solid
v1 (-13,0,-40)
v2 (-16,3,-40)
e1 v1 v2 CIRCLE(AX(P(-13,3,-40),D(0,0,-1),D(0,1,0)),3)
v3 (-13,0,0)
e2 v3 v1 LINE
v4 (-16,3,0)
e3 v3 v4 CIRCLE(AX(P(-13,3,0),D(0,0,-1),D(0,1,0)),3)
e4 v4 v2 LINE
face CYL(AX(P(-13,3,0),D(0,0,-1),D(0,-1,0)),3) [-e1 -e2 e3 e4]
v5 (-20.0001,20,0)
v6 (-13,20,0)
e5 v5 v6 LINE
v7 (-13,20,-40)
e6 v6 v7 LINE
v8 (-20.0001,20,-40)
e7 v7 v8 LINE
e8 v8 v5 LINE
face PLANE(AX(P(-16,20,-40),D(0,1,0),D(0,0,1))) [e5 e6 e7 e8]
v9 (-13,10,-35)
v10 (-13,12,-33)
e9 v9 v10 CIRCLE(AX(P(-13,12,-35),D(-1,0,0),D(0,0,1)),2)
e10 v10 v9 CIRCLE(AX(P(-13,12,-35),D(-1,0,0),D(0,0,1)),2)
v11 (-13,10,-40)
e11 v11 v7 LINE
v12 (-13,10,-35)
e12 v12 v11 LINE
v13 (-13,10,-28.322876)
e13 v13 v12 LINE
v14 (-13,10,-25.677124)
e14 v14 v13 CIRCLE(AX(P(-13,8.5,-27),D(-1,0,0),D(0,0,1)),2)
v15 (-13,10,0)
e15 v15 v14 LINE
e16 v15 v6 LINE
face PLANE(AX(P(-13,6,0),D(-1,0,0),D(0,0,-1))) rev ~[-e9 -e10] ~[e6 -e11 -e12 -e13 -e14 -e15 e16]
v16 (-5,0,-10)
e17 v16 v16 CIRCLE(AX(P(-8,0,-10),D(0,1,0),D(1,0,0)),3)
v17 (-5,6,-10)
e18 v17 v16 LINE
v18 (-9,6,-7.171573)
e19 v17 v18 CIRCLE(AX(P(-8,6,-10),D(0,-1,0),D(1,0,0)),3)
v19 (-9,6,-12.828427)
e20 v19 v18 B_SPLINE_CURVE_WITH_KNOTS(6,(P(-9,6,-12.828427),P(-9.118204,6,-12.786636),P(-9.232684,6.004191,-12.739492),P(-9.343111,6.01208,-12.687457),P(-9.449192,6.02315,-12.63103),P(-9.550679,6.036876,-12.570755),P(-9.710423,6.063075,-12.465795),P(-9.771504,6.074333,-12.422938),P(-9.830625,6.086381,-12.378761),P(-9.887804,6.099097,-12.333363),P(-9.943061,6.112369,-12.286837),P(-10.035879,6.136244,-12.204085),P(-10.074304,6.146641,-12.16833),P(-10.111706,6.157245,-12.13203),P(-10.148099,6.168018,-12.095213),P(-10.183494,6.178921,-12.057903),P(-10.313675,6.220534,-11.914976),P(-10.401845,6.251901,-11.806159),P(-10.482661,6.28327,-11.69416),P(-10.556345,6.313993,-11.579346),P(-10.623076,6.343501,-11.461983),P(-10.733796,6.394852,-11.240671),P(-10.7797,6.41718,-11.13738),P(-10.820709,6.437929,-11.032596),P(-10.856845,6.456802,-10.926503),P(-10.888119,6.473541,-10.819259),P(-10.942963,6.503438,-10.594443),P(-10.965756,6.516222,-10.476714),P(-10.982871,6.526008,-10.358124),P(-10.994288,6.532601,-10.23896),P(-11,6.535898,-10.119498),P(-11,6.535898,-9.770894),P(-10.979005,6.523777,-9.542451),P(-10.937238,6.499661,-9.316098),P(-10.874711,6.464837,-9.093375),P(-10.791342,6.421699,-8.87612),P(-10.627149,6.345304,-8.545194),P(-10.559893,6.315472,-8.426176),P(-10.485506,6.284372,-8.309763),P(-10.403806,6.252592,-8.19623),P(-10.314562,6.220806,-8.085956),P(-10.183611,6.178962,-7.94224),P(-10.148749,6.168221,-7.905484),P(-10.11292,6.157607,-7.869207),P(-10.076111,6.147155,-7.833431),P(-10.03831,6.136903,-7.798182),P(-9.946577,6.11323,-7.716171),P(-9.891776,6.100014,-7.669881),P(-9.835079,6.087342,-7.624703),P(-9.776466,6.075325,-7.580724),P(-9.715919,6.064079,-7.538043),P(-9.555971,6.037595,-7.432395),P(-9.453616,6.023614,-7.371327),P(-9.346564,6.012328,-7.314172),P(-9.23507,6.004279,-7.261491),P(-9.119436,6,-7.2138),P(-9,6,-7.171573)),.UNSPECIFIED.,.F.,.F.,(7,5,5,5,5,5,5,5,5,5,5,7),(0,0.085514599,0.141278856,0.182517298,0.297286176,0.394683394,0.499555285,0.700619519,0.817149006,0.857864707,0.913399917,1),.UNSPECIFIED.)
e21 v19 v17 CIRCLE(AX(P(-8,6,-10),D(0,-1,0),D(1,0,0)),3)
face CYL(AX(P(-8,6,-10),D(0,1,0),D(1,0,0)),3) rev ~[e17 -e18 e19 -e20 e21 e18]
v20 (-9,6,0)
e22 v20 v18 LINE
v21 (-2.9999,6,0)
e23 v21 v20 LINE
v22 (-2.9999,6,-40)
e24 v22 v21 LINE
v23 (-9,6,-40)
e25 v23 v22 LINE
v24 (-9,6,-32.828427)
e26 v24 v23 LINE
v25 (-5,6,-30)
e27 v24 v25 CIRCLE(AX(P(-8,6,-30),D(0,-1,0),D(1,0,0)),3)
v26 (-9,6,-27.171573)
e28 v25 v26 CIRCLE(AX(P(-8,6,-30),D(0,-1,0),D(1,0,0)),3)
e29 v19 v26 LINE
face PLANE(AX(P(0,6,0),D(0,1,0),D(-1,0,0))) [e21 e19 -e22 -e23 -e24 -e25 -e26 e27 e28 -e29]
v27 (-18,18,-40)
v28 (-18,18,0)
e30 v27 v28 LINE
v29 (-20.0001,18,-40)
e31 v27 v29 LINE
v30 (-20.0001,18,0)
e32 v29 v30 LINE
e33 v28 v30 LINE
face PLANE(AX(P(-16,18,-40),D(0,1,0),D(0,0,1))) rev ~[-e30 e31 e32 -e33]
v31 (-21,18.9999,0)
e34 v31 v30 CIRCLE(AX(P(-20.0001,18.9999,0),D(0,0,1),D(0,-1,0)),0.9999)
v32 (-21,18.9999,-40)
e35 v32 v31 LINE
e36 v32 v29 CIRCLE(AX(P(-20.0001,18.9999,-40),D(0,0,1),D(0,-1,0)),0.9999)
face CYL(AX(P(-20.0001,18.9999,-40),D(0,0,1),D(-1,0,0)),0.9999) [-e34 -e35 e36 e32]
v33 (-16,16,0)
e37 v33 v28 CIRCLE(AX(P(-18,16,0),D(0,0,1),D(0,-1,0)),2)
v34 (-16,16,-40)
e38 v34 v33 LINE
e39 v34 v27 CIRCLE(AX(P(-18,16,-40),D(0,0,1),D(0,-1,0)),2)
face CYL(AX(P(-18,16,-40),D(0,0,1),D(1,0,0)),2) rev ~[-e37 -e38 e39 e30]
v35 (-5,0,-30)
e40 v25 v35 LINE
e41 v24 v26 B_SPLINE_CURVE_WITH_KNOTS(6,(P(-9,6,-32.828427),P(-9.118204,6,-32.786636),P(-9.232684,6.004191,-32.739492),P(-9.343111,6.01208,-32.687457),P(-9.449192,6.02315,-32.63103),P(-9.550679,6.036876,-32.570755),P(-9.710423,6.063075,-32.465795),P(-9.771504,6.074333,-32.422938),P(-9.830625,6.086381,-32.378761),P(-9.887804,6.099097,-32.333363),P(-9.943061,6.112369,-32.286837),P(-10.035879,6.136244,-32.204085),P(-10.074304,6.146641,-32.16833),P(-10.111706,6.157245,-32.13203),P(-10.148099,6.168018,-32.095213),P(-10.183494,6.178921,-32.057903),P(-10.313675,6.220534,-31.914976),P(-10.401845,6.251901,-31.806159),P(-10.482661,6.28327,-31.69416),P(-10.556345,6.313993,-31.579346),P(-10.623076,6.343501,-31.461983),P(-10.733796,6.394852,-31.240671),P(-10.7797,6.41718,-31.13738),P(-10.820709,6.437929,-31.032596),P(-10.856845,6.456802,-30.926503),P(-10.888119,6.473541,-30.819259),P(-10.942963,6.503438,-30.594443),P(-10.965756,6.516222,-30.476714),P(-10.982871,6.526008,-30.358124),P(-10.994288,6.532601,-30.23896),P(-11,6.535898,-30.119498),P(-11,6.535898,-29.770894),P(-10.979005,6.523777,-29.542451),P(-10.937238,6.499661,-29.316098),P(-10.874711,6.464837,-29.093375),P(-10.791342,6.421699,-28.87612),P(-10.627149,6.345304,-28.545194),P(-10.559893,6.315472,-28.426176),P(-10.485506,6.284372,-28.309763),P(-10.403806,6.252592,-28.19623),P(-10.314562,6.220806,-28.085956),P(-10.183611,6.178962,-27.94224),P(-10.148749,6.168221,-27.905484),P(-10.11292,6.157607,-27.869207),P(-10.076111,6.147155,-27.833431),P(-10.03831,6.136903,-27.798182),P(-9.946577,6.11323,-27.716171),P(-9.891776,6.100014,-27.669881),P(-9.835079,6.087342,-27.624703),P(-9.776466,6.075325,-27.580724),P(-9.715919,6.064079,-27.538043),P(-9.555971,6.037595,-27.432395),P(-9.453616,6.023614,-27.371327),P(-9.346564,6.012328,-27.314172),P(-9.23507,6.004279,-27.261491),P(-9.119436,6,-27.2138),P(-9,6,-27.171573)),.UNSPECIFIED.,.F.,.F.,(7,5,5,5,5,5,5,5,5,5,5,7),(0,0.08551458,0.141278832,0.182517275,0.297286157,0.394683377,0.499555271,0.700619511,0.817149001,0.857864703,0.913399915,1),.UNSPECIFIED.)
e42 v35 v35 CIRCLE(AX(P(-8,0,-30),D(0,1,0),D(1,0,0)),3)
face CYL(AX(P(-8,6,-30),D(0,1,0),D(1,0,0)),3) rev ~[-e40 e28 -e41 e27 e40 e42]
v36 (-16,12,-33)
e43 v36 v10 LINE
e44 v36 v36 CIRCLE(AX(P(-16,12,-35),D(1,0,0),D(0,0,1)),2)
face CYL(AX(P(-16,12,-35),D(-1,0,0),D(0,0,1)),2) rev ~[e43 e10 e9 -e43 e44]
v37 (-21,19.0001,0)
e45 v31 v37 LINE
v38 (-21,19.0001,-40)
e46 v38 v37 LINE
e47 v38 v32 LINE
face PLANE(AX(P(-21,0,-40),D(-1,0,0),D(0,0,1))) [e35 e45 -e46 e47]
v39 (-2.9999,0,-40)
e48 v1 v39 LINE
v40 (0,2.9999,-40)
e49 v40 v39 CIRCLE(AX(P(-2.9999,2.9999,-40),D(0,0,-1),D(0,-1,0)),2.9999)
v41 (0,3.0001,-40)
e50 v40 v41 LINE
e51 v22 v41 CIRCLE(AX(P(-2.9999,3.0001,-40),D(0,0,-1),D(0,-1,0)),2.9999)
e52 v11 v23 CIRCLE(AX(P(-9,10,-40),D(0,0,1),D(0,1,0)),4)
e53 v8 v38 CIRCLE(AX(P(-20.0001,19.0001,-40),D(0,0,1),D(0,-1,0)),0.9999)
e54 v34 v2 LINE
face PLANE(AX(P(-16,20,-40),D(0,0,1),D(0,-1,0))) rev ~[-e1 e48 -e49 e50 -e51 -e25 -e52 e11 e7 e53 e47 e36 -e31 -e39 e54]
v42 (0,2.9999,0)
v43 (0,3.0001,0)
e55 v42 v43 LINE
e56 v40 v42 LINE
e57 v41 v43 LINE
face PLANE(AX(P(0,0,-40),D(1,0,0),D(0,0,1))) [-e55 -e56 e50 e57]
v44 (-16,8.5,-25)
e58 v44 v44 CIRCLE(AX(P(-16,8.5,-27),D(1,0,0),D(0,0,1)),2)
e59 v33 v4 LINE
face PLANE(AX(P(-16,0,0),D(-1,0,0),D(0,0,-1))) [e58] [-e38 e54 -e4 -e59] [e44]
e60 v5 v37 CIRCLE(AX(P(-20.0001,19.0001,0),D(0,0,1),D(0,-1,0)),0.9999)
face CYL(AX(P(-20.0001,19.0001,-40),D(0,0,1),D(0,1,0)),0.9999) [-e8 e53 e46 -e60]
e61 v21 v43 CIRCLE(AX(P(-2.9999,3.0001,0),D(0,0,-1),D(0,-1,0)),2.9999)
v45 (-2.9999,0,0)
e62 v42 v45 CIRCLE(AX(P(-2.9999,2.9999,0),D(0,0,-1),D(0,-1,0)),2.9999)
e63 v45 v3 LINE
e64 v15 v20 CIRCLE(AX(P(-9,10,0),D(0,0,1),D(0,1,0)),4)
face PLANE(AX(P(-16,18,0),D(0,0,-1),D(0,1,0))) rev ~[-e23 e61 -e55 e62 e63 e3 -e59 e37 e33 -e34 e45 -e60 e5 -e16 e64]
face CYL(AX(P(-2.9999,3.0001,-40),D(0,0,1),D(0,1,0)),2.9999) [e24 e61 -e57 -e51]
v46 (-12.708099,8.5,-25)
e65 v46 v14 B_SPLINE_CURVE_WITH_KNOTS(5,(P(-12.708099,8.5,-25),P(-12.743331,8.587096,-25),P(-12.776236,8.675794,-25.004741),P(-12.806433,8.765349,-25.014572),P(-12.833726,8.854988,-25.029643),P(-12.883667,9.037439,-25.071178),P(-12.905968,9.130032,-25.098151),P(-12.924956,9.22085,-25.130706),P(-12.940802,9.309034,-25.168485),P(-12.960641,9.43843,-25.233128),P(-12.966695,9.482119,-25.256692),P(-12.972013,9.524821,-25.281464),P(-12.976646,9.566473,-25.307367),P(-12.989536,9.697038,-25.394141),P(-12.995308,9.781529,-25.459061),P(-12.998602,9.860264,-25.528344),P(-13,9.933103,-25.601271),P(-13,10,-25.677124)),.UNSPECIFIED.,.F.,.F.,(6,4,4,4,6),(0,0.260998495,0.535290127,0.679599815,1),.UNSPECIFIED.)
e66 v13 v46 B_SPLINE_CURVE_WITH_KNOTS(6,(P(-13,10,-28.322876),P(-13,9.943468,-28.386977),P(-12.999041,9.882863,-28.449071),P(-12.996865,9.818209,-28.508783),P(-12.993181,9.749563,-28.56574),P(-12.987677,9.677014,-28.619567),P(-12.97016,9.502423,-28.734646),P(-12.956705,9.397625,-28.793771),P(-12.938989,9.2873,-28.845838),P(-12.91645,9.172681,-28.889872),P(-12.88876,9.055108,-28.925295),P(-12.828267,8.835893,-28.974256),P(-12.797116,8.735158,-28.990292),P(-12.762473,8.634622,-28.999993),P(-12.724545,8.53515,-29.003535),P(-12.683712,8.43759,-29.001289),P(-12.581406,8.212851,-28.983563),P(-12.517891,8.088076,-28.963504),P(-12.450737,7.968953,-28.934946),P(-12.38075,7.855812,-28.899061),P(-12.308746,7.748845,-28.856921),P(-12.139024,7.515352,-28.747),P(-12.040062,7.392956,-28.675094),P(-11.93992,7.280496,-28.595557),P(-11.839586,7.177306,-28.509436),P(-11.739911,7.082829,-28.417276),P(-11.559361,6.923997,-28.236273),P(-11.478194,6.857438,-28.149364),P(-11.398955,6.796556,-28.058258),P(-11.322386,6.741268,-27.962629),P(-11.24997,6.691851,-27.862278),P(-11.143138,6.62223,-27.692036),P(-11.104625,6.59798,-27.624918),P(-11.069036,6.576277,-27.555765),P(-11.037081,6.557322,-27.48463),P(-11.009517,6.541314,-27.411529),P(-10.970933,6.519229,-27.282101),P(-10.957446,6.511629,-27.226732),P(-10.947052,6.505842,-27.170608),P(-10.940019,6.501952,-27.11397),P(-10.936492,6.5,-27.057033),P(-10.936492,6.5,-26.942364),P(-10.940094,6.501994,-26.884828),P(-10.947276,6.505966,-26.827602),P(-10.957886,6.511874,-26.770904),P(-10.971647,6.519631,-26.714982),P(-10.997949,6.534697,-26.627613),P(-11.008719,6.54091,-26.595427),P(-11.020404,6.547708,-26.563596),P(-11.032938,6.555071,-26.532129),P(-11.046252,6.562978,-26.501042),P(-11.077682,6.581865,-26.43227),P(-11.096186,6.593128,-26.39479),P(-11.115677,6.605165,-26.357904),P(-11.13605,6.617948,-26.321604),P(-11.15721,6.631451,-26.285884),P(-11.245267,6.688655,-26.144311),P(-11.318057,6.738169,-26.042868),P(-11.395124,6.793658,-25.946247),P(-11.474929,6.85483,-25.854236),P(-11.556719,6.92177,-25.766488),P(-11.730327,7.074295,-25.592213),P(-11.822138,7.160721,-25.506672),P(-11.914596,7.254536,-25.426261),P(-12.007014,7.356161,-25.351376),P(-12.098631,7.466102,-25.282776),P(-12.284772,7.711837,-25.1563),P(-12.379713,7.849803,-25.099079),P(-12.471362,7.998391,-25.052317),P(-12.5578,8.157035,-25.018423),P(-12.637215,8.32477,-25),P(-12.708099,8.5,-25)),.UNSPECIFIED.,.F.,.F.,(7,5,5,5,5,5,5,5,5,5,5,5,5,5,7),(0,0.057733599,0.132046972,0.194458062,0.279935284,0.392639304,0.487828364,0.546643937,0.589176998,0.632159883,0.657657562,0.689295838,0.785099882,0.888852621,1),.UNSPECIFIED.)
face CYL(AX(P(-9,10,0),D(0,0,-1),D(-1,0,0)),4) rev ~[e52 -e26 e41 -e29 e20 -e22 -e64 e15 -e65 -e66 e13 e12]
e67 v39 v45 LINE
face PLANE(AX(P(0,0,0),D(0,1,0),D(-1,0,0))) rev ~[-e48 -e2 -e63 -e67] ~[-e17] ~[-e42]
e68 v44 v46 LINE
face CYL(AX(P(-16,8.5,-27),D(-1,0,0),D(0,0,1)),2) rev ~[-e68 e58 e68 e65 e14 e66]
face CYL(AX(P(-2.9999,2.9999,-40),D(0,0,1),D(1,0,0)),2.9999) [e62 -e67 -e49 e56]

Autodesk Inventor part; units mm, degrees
ref_plane "YZ Plane" through (0, 0, 0) normal (1, 0, 0) x (0, 1, 0)
ref_plane "XZ Plane" through (0, 0, 0) normal (0, 1, 0) x (-1, 0, 0)
ref_plane "XY Plane" through (0, 0, 0) normal (0, 0, 1) x (1, 0, 0)
sketch "Sketch1" plane through (0, 0, 0) normal (0, 1, 0) x (-1, 0, 0)
  line L0 (0, 0) -> (16, 0)
  line L1 (16, 0) -> (16, -40)
  line L2 (16, -40) -> (0, -40)
  line L3 (0, -40) -> (0, 0)
  dimension "d0" = 16
  dimension "d1" = 40
extrude "Extrusion1" add sketch "Sketch1" along normal blind 6
sketch "Sketch2" plane through (0, 6, 0) normal (0, 1, 0) x (1, 0, 0)
  line L0 (-16, 0) -> (0, 0) projected
  line L1 (0, 40) -> (-16, 40) projected
  line L2 (-16, 0) -> (-13, 0)
  line L3 (-13, 0) -> (-13, 40)
  line L4 (-13, 40) -> (-16, 40)
  line L5 (-16, 40) -> (-16, 0)
  dimension "d4" = 3
extrude "Extrusion2" add sketch "Sketch2" along normal blind 14
sketch "Sketch3" plane through (-16, 0, -40) normal (-1, 0, 0) x (0, 0, 1)
  line L0 (0, 20) -> (40, 20) projected
  line L1 (40, 20) -> (0, 20)
  line L2 (0, 20) -> (0, 18)
  line L3 (0, 18) -> (40, 18)
  line L4 (40, 18) -> (40, 20)
  point P0 (40, 0)
  point P1 (0, 20)
  dimension "d7" = 40
  dimension "d8" = 2
extrude "Extrusion3" add sketch "Sketch3" along normal blind 5
fillet "Fillet1" radius 1 2 edges at (-21, 20, -20) (-21, 18, -20)
fillet "Fillet2" radius 4 1 edges at (-13, 6, -20)
fillet "Fillet3" radius 3 2 edges at (0, 6, -20) (0, 0, -20)
fillet "Fillet4" radius 3 1 edges at (-16, 0, -20)
sketch "Sketch4" plane through (0, 6, 0) normal (0, 1, 0) x (1, 0, 0)
  line L0 (-8, 0) -> (-8, 10)
  line L1 (-3, 40) -> (-13, 40) projected
  circle A0 centre (-8, 10) radius 3
  line L2 (-8, 40) -> (-8, 30)
  line L3 (-8, 40) -> (2, 40) construction
  circle A1 centre (-8, 30) radius 3
  point P0 (0, 0)
  dimension "d15" = 10
  dimension "d16" = 6
  dimension "d17" = 10
  dimension "d18" = 90
  dimension "d19" = 5
  dimension "d20" = 6
  dimension "d23" = 5
extrude "Extrusion4" cut sketch "Sketch4" against normal through all both and the other way through all
fillet "Fillet5" radius 2 1 edges at (-16, 18, -20)
sketch "Sketch5" plane through (-16, 3, -40) normal (-1, 0, 0) x (0, 0, 1)
  line L0 (0, 5.5) -> (5, 5.5)
  line L1 (5, 5.5) -> (5, 9)
  line L2 (5, 5.5) -> (8.5, 5.5) construction
  line L3 (5, 5.5) -> (13, 5.5)
  circle A0 centre (5, 9) radius 2
  circle A1 centre (13, 5.5) radius 2
  line L4 (40, 0) -> (0, 0) projected
  line L5 (0, 7) -> (0, 17) projected
  line L6 (0, -3) -> (40, -3) projected
  dimension "d25" = 5
  dimension "d28" = 3.5
  dimension "d29" = 90
  dimension "d30" = 8
  dimension "d32" = 4
  dimension "d33" = 4
  dimension "d38" = 8.5
extrude "Extrusion5" cut sketch "Sketch5" against normal through all both and the other way through all
properties part number "Cable_Guide_Support_small"
